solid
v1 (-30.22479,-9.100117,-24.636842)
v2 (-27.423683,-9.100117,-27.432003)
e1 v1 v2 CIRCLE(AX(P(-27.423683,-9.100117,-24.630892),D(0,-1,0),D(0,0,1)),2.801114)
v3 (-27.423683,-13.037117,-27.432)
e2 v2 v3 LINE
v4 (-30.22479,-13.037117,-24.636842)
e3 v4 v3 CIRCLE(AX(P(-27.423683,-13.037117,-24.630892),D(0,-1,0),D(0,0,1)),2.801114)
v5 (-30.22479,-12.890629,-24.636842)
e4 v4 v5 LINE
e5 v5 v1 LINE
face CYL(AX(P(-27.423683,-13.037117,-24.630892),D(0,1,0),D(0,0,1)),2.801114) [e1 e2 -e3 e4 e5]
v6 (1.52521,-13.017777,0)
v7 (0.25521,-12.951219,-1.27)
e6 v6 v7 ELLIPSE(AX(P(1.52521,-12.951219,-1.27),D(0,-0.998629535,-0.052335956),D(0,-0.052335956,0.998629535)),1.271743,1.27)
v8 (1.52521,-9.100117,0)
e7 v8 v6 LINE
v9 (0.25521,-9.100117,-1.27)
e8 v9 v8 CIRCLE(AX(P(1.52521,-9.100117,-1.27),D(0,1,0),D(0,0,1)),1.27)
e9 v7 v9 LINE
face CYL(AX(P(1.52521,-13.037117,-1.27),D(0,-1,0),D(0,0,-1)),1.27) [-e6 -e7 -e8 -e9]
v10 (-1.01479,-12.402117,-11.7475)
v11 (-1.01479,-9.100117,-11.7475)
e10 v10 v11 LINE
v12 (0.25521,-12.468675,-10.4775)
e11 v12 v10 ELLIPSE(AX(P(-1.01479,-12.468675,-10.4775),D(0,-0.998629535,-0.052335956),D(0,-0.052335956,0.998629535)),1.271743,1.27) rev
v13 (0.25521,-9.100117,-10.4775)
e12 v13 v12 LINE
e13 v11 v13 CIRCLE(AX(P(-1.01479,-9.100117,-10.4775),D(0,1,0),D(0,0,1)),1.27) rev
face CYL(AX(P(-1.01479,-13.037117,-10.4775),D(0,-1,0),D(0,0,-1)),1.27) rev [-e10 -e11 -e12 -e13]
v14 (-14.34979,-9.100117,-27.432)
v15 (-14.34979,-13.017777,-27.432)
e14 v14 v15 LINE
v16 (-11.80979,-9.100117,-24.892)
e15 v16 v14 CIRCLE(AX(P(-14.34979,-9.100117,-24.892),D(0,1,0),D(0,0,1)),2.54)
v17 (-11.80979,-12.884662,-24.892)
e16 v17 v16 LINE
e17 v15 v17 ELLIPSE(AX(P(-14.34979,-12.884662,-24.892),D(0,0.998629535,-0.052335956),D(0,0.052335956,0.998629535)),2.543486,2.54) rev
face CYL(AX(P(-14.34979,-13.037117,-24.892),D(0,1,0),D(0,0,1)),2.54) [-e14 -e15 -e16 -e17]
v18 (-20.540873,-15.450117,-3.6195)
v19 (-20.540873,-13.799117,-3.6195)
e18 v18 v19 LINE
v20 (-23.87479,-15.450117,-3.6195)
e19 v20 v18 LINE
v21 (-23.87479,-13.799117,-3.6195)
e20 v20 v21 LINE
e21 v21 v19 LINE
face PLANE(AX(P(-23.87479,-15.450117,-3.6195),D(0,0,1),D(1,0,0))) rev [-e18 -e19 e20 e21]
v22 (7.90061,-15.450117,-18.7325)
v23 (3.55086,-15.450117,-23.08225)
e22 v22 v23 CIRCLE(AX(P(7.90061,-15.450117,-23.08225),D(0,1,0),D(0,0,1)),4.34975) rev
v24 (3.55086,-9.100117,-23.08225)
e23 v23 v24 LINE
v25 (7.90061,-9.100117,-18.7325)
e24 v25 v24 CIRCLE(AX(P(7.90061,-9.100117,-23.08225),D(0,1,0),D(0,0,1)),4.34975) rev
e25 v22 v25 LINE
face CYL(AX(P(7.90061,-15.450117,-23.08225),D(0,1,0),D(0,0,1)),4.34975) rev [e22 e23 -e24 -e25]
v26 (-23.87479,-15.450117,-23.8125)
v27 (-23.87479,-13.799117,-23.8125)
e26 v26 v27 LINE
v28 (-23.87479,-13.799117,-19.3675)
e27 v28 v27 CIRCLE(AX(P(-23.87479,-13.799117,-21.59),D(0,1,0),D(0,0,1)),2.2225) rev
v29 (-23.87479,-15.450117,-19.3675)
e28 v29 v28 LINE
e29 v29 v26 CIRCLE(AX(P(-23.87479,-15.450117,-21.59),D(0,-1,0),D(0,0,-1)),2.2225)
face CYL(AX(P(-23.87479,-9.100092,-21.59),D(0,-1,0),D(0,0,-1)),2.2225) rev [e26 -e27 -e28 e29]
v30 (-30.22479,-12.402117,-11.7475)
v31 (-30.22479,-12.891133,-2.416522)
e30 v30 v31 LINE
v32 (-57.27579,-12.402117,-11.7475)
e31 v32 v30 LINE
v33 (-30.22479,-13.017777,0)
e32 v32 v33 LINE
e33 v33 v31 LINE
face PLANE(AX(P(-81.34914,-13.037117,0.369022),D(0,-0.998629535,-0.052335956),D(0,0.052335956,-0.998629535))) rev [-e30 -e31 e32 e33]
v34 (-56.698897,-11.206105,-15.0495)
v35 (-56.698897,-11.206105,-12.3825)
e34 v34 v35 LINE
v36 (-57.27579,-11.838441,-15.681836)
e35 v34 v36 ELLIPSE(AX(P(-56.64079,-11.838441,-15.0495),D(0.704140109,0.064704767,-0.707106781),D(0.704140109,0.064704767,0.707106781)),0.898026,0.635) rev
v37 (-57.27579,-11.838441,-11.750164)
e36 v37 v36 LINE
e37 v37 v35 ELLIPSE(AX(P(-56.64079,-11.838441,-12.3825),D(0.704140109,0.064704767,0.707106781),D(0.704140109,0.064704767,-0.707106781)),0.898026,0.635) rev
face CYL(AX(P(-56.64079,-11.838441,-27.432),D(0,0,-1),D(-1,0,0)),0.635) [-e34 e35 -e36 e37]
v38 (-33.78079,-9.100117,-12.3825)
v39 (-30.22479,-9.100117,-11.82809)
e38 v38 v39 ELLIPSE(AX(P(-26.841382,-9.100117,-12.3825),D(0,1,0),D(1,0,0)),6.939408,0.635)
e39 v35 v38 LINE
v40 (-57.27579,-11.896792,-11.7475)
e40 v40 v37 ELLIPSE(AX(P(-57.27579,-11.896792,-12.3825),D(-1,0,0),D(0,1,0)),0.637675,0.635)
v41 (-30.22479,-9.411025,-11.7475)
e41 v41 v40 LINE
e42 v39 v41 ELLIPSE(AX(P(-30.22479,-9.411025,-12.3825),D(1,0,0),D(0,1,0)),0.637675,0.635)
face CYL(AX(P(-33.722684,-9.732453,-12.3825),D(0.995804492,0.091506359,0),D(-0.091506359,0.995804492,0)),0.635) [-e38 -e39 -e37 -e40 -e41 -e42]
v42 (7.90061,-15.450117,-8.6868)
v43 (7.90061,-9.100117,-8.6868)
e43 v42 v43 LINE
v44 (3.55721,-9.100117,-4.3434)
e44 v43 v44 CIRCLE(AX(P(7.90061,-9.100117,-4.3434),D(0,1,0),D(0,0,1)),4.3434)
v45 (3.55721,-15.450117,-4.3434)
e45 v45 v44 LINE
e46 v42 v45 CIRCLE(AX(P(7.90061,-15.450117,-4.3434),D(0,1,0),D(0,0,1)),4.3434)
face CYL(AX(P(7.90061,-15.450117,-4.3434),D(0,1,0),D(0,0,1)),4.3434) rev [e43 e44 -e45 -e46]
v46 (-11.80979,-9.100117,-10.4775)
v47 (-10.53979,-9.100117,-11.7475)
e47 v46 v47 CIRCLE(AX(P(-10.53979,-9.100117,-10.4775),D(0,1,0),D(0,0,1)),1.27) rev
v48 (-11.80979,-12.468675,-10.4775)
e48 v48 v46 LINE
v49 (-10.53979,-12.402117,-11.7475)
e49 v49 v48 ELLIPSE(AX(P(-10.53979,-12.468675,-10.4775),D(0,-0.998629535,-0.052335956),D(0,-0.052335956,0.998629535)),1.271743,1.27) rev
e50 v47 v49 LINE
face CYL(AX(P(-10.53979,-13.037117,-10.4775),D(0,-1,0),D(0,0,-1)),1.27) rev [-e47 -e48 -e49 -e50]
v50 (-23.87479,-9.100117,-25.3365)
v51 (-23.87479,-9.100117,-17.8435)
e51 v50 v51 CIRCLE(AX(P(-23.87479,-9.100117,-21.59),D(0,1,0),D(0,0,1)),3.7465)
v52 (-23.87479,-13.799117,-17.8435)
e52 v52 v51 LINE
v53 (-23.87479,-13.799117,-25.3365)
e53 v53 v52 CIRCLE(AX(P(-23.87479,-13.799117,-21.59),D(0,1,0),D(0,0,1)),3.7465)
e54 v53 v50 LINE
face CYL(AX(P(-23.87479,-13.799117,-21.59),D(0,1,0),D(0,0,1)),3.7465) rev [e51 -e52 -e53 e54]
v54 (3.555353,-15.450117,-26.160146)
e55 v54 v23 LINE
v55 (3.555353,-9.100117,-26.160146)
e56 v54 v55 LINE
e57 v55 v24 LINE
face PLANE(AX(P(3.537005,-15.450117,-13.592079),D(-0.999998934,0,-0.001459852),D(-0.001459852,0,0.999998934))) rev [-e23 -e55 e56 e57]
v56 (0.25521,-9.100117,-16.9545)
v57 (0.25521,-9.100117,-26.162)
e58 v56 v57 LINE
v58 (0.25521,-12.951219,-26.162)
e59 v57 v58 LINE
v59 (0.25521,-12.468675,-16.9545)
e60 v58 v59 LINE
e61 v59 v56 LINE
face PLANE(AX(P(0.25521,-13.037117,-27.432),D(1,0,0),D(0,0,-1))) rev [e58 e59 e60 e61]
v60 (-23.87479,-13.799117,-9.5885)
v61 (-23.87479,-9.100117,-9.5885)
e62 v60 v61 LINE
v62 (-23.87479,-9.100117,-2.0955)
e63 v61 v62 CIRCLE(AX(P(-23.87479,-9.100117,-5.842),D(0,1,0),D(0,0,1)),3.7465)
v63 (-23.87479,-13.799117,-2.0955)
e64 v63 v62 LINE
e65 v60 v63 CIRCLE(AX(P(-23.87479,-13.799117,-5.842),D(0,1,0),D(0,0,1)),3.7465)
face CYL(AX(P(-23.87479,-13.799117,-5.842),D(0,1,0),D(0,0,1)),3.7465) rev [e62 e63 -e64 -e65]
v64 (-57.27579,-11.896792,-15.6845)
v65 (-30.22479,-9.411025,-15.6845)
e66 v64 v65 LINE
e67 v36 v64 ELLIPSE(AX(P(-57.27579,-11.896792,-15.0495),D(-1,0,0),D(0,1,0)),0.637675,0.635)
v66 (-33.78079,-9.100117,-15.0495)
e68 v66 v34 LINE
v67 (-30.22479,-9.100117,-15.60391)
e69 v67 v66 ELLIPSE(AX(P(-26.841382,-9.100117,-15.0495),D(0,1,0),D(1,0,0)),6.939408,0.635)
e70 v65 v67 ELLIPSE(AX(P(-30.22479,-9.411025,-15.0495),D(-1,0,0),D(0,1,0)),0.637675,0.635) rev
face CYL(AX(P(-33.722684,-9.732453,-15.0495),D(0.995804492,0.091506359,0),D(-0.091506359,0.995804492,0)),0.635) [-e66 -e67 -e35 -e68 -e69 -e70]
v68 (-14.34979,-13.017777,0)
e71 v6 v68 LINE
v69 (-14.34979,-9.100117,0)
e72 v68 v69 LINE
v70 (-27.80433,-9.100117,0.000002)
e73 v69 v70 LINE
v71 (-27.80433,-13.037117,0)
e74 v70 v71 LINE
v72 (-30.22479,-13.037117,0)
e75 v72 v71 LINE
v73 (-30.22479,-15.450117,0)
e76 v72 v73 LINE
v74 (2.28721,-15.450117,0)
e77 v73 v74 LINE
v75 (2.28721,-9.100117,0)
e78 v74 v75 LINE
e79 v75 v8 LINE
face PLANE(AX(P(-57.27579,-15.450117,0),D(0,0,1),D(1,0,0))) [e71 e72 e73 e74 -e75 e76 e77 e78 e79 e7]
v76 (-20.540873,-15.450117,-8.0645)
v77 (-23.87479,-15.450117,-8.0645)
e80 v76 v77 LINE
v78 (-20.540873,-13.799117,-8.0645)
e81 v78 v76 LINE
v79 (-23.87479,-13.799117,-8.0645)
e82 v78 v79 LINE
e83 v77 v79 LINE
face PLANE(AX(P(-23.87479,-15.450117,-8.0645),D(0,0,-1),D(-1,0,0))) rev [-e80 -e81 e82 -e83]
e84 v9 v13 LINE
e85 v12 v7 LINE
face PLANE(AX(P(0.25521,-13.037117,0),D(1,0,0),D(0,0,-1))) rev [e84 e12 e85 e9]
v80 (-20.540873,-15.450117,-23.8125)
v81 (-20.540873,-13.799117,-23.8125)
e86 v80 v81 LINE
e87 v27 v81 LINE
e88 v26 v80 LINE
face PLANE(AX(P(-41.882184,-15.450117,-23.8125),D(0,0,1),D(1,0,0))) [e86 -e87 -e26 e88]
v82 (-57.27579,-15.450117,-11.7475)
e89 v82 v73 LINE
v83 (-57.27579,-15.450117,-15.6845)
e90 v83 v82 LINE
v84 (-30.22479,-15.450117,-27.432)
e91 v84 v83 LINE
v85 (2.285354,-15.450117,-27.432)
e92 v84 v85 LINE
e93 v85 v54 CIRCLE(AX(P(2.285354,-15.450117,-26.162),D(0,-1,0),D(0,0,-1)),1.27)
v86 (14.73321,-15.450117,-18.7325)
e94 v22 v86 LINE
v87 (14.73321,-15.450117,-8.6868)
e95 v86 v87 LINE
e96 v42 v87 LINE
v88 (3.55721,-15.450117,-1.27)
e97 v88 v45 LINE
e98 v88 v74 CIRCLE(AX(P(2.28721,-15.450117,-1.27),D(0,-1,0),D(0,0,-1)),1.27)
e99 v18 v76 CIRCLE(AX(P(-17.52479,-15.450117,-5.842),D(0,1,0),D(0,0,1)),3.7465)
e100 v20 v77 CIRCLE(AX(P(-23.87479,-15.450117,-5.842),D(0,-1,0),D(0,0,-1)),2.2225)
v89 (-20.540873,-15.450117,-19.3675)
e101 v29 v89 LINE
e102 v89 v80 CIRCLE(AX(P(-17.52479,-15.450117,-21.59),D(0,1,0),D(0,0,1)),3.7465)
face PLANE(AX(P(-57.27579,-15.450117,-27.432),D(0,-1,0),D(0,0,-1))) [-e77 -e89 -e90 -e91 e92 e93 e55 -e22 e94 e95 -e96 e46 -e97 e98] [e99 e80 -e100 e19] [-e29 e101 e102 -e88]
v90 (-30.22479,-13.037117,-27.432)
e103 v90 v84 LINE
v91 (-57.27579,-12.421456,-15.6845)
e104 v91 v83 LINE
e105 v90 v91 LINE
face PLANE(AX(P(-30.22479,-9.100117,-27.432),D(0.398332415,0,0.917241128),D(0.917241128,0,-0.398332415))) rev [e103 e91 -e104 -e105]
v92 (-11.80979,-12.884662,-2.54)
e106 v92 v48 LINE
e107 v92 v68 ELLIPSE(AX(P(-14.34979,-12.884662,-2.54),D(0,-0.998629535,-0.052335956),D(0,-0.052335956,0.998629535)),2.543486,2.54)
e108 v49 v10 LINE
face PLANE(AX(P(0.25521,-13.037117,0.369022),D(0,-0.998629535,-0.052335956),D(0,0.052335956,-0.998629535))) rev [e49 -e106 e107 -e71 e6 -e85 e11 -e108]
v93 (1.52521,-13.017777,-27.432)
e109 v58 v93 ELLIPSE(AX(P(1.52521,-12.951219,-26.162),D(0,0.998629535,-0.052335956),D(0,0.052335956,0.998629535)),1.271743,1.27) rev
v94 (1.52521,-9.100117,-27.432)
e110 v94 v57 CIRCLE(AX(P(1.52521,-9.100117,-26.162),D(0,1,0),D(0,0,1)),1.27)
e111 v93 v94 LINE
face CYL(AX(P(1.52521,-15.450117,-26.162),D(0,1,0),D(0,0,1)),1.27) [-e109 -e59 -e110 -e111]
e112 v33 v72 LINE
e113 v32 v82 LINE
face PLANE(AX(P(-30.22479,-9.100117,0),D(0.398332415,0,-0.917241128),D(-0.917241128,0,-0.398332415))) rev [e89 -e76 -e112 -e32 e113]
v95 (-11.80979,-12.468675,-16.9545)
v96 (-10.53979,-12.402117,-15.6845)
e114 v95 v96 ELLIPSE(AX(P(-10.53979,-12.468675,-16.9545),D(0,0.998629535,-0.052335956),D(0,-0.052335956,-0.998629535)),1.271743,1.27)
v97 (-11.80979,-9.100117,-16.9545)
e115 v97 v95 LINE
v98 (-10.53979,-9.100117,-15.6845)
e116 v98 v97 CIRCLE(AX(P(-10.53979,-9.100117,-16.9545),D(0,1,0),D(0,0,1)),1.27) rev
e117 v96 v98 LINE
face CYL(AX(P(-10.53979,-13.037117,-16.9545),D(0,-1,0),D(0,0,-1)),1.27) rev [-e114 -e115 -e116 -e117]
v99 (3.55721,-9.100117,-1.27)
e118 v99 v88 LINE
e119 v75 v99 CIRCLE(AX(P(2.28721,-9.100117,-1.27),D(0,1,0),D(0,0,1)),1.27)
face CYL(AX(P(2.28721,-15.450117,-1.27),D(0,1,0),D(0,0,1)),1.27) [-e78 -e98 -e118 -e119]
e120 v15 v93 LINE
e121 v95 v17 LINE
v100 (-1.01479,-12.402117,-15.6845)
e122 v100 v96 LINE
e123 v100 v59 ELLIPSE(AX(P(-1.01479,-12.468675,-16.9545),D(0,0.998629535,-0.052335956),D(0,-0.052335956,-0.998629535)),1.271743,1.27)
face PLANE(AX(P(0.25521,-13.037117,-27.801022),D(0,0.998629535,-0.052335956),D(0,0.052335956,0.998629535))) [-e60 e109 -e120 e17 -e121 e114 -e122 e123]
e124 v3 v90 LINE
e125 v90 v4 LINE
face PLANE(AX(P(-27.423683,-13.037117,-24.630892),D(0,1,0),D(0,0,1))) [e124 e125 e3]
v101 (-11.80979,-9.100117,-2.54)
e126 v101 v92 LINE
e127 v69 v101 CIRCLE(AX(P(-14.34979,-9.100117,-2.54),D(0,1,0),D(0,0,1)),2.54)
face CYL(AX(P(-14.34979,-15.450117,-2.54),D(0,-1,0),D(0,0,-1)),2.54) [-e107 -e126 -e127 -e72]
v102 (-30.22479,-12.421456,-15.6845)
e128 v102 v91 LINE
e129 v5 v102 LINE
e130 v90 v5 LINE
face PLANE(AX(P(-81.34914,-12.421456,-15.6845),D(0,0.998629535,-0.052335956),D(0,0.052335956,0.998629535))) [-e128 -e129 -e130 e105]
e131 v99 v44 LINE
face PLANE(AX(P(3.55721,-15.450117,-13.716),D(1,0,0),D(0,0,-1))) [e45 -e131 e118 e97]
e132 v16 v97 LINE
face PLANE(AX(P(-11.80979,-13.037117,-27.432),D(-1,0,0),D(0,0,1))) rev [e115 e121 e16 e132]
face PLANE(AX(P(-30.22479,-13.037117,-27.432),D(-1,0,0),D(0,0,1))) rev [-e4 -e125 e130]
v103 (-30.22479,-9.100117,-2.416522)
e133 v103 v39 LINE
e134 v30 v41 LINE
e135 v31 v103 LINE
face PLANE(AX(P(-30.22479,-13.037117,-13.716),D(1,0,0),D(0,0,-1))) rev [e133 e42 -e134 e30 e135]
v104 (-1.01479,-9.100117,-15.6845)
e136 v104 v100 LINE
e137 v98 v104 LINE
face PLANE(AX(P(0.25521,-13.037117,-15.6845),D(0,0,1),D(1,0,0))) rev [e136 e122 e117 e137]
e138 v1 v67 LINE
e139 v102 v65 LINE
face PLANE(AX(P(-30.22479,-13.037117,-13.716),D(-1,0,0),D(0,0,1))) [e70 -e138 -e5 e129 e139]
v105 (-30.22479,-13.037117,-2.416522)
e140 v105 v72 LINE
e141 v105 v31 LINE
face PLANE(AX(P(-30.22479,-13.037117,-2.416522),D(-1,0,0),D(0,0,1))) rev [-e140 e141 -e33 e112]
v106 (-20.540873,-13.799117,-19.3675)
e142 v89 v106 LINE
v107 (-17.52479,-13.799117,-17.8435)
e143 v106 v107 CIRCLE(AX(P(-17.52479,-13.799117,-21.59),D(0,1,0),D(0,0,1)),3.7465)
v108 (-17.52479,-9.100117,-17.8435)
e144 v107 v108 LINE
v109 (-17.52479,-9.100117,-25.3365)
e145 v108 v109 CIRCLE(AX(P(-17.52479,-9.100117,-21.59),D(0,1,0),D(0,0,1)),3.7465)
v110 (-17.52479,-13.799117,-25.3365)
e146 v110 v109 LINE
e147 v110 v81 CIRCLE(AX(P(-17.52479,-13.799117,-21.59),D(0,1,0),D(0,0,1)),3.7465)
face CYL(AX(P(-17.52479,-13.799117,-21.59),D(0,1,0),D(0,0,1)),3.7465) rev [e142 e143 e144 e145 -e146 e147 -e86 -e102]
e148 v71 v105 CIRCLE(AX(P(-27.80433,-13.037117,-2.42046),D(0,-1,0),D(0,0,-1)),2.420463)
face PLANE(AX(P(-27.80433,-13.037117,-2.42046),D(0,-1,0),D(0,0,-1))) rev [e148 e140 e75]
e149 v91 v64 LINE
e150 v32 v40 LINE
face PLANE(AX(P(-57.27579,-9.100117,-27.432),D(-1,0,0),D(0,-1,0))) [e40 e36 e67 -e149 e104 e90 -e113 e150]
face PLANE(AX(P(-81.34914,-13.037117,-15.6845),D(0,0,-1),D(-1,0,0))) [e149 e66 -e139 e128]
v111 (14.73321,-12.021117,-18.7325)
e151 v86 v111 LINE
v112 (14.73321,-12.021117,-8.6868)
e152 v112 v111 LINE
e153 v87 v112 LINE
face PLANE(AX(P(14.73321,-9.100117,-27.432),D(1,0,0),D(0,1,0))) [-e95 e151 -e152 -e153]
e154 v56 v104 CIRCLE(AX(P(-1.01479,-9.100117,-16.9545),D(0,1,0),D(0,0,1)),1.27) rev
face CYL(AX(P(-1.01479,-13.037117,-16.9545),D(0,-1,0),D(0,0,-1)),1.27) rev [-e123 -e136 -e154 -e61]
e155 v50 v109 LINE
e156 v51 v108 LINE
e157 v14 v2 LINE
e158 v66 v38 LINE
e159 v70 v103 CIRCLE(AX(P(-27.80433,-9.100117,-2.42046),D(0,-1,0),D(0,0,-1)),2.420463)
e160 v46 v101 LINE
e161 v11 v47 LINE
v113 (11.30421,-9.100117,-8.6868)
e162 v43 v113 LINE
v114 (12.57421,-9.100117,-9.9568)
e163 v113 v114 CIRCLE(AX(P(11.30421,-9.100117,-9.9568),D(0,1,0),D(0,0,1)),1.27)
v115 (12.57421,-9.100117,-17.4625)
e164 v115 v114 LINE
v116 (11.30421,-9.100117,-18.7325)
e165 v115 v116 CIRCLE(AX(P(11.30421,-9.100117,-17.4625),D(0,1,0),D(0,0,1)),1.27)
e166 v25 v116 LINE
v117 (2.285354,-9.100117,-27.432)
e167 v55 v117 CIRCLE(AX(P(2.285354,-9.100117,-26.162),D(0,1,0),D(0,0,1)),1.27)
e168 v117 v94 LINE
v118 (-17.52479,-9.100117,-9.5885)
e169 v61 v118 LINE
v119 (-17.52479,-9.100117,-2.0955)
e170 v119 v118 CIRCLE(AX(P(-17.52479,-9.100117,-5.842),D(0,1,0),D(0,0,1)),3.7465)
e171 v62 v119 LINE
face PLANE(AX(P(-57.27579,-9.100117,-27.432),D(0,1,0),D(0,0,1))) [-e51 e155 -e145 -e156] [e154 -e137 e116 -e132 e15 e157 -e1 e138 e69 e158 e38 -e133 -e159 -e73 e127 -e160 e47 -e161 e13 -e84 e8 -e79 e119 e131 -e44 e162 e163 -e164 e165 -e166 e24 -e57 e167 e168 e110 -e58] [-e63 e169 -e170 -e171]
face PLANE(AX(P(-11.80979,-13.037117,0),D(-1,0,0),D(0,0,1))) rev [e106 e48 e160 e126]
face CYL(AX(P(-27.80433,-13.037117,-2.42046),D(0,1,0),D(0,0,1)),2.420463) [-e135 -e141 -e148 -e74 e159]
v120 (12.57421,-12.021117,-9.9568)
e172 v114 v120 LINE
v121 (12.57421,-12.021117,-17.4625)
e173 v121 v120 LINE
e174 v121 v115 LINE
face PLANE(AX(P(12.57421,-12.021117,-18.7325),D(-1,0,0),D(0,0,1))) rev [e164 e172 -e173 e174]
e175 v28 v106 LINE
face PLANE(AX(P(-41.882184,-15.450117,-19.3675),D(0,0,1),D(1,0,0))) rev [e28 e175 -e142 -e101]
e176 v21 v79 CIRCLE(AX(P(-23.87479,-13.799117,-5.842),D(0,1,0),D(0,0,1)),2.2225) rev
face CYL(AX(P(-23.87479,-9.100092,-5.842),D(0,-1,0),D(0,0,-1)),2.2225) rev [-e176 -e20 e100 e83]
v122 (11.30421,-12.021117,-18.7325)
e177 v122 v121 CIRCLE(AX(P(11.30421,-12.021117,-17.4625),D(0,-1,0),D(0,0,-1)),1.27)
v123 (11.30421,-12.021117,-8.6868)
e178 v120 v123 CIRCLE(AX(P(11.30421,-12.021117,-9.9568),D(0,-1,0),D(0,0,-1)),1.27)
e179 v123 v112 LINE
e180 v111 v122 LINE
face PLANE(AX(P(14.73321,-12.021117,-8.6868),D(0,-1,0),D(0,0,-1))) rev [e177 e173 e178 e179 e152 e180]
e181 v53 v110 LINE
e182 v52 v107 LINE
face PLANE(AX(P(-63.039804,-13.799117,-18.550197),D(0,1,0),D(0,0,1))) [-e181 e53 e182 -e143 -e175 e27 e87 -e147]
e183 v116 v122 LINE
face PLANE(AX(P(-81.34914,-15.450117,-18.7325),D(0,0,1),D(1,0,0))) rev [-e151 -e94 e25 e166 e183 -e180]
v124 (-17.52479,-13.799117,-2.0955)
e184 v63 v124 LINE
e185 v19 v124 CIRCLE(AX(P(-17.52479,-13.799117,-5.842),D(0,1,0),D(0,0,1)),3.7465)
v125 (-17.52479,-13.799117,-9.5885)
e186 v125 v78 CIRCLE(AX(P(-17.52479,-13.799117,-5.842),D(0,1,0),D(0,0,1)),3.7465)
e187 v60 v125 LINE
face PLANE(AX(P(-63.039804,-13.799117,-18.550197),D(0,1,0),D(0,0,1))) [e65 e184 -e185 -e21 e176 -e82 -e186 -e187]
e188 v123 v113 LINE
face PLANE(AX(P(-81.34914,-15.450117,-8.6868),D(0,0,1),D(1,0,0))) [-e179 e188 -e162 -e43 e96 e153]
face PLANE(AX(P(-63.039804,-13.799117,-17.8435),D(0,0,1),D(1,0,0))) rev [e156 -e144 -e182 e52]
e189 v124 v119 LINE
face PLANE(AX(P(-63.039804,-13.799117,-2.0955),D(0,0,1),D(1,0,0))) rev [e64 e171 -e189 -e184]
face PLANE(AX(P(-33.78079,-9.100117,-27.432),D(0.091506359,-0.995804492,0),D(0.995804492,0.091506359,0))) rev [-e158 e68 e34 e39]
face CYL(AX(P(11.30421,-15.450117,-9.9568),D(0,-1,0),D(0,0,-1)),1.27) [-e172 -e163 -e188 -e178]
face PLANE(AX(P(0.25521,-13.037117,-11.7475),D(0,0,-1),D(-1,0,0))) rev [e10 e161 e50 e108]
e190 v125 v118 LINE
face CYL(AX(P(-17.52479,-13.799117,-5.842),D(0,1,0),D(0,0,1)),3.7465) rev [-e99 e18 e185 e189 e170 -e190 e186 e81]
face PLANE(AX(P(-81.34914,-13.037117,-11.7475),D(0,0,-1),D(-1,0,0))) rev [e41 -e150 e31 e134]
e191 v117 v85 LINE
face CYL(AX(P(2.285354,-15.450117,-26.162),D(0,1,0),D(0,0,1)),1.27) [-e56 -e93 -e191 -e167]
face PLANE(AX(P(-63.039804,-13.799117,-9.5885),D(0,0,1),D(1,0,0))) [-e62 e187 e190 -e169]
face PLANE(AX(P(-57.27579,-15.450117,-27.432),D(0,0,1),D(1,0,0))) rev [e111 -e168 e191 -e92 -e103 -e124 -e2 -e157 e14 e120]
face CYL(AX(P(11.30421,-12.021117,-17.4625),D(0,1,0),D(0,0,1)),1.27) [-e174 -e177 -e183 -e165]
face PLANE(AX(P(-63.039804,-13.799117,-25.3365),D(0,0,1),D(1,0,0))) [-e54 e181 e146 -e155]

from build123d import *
from OCP.BRepAlgoAPI import BRepAlgoAPI_Cut
from OCP.TopTools import TopTools_ListOfShape

# Parameters (mm, degrees)
SKETCH1_W           = 72.009
SKETCH1_H           = 6.35
BOSS_EXTRUDE1_DEPTH = 27.432
CUT_EXTRUDE2_DEPTH  = 64.822827375
SKETCH4_W           = 12.065
SKETCH4_H           = 11.7475
CUT_EXTRUDE3_DEPTH  = 3.937
SKETCH5_W           = 27.051
SKETCH5_H           = 11.7475
CUT_EXTRUDE4_DEPTH  = 3.937
SKETCH6_W           = 2.159
SKETCH6_H           = 10.0457
CUT_EXTRUDE5_DEPTH  = 2.921
CHAMFER1_SIZE       = 0.635
CHAMFER1_SIZE_2     = 12.116521797
CHAMFER2_SIZE       = 12.116521797
CHAMFER2_SIZE_2     = 0.635
CHAMFER3_SIZE       = 0.615660387
CHAMFER3_SIZE_2     = 11.7475
CUT_EXTRUDE8_DEPTH  = 64.822827375
CUT_EXTRUDE10_DEPTH = 62.361435951
FILLET1_R           = 2.54
FILLET2_R           = 2.54
FILLET5_R           = 1.27
FILLET6_R           = 1.27
FILLET10_R          = 1.27
CUT_EXTRUDE11_START = -3.937
CUT_EXTRUDE11_DEPTH = 4.937
SKETCH17_R          = 2.2225
CUT_EXTRUDE12_DEPTH = 64.82283009
CUT_EXTRUDE13_START = -4.699
SKETCH18_R          = 3.7465
SKETCH18_R_2        = 2.2225
CUT_EXTRUDE13_DEPTH = 4.699
SKETCH19_R          = 3.7465
CUT_EXTRUDE14_DEPTH = 64.679759278
SKETCH20_W          = 4.845296959
SKETCH20_H          = 4.445
CUT_EXTRUDE15_DEPTH = 64.679759278
FILLET12_R          = 0.635


with BuildPart() as part:
    # Sketch1 → Boss-Extrude1 (new body)
    with BuildSketch(Plane.XY):
        with Locations((-21.271290436, -12.275116881)):
            Rectangle(SKETCH1_W, SKETCH1_H)
    extrude(amount=-BOSS_EXTRUDE1_DEPTH)

    # Sketch3 → Cut-Extrude2 (cut, through all)
    with BuildSketch(Plane(origin=(0, -9.100116881, 0), x_dir=(1, 0, 0), z_dir=(0, 1, 0))):
        with BuildLine():
            ThreePointArc((3.550859564, 23.08225), (4.824871842, 20.006512279), (7.900609564, 18.7325))
            Line((7.900609564, 18.7325), (14.733209564, 18.7325))
            Line((14.733209564, 18.7325), (14.733209564, 27.432))
            Line((14.733209564, 27.432), (3.557209564, 27.432))
            Line((3.557209564, 27.432), (3.550859564, 23.08225))
        make_face()
        with BuildLine():
            Line((14.733209564, 0), (14.733209564, 8.6868))
            Line((14.733209564, 8.6868), (7.900609564, 8.6868))
            ThreePointArc((7.900609564, 8.6868), (4.82936197, 7.414647593), (3.557209564, 4.3434))
            Line((3.557209564, 4.3434), (3.557209564, 0))
            Line((3.557209564, 0), (14.733209564, 0))
        make_face()
    extrude(amount=-CUT_EXTRUDE2_DEPTH, mode=Mode.SUBTRACT)

    # Sketch4 → Cut-Extrude3 (cut)
    with BuildSketch(Plane(origin=(0, -9.100116881, 0), x_dir=(1, 0, 0), z_dir=(0, 1, 0))):
        with Locations((-5.777290436, 21.55825)):
            Rectangle(SKETCH4_W, SKETCH4_H)
        with Locations((-5.777290436, 5.87375)):
            Rectangle(SKETCH4_W, SKETCH4_H)
    extrude(amount=-CUT_EXTRUDE3_DEPTH, mode=Mode.SUBTRACT)

    # Sketch5 → Cut-Extrude4 (cut)
    with BuildSketch(Plane(origin=(0, -9.100116881, 0), x_dir=(1, 0, 0), z_dir=(0, 1, 0))):
        with Locations((-43.750290436, 21.55825)):
            Rectangle(SKETCH5_W, SKETCH5_H)
        with Locations((-43.750290436, 5.87375)):
            Rectangle(SKETCH5_W, SKETCH5_H)
    extrude(amount=-CUT_EXTRUDE4_DEPTH, mode=Mode.SUBTRACT)

    # Sketch6 → Cut-Extrude5 (cut)
    with BuildSketch(Plane(origin=(0, -9.100116881, 0), x_dir=(1, 0, 0), z_dir=(0, 1, 0))):
        with Locations((13.653709564, 13.70965)):
            Rectangle(SKETCH6_W, SKETCH6_H)
    extrude(amount=-CUT_EXTRUDE5_DEPTH, mode=Mode.SUBTRACT)

    # Chamfer1
    # the kernel refuses this chamfer: 12.116521797, 0.635 mm, written as the material it adds along each edge
    with BuildSketch(Plane(origin=(-43.311150406, -13.037116881, -11.7475), x_dir=(0, 1, 0), z_dir=(1, 0, 0))) as chamfer1_piece_1_section:
        Polygon((CHAMFER1_SIZE, 0), (0, CHAMFER1_SIZE_2), (0, 0), align=None)
    chamfer1_piece_1 = extrude(amount=75.06771994, mode=Mode.PRIVATE)
    chamfer1_piece_1 = split(chamfer1_piece_1, bisect_by=Plane(origin=(-43.311150406, -13.037116881, 0), z_dir=(0, 0, -1)), keep=Keep.TOP, mode=Mode.PRIVATE)
    chamfer1_piece_1 = split(chamfer1_piece_1, bisect_by=Plane(origin=(3.557209564, -13.037116881, -11.7475), z_dir=(-1, 0, 0)), keep=Keep.TOP, mode=Mode.PRIVATE)
    add(chamfer1_piece_1)
    with BuildSketch(Plane(origin=(1.276569534, -13.037116881, -11.7475), x_dir=(0, 1, 0), z_dir=(-1, 0, 0))) as chamfer1_piece_2_section:
        Polygon((CHAMFER1_SIZE, 0), (0, -CHAMFER1_SIZE_2), (0, 0), align=None)
    chamfer1_piece_2 = extrude(amount=58.55235997, mode=Mode.PRIVATE)
    chamfer1_piece_2 = split(chamfer1_piece_2, bisect_by=Plane(origin=(1.276569534, -13.037116881, 0), z_dir=(0, 0, -1)), keep=Keep.TOP, mode=Mode.PRIVATE)
    add(chamfer1_piece_2)

    # Chamfer2
    # the kernel refuses this chamfer: 12.116521797, 0.635 mm, written as the material it adds along each edge
    with BuildSketch(Plane(origin=(-11.809790436, -13.037116881, -15.6845), x_dir=(0, 0, -1), z_dir=(1, 0, 0))) as chamfer2_piece_1_section:
        Polygon((CHAMFER2_SIZE, 0), (0, CHAMFER2_SIZE_2), (0, 0), align=None)
    chamfer2_piece_1 = extrude(amount=43.56635997, mode=Mode.PRIVATE)
    chamfer2_piece_1 = split(chamfer2_piece_1, bisect_by=Plane(origin=(-11.809790436, -13.037116881, -27.432), z_dir=(0, 0, 1)), keep=Keep.TOP, mode=Mode.PRIVATE)
    chamfer2_piece_1 = split(chamfer2_piece_1, bisect_by=Plane(origin=(3.540027216, -13.037116881, -15.662091507), z_dir=(-0.9999989344148313, 0, -0.0014598524589999236)), keep=Keep.TOP, mode=Mode.PRIVATE)
    add(chamfer2_piece_1)

    # Chamfer3
    # the kernel refuses this chamfer: 11.7475, 0.615660387 mm, written as the material it adds along each edge
    with BuildSketch(Plane(origin=(-57.275790436, -13.037116881, -15.6845), x_dir=(0, 1, 0), z_dir=(1, 0, 0))) as chamfer3_piece_1:
        Polygon((CHAMFER3_SIZE, 0), (0, -CHAMFER3_SIZE_2), (0, 0), align=None)
    extrude(amount=57.592951928)

    # Sketch14 → Cut-Extrude8 (cut, through all)
    with BuildSketch(Plane.XZ.offset(15.450116881)):
        Polygon((-30.224790436, 0), (-57.275790436, -11.7475), (-57.275790436, 0), align=None)
        Polygon((-30.224790436, -27.432), (-57.275790436, -15.6845), (-57.275790436, -27.432), align=None)
    extrude(amount=-CUT_EXTRUDE8_DEPTH, mode=Mode.SUBTRACT)

    # Sketch15 → Cut-Extrude10 (cut, through all)
    with BuildSketch(Plane.XY.offset(-11.7475)):
        Polygon((-57.275790436, -9.100116881), (-33.780790436, -9.100116881), (-57.275790436, -11.259116881), align=None)
    extrude(amount=-CUT_EXTRUDE10_DEPTH, mode=Mode.SUBTRACT)

    # Fillet1
    fillet1_edges = [part.edges().sort_by_distance(p)[0] for p in [
        (-11.809790436, -11.058947074, -27.432),
    ]]
    fillet(fillet1_edges, radius=FILLET1_R)

    # Fillet2
    fillet2_edges = [part.edges().sort_by_distance(p)[0] for p in [
        (-11.809790436, -11.058947074, 0),
    ]]
    fillet(fillet2_edges, radius=FILLET2_R)

    # Fillet5
    fillet5_edges = [part.edges().sort_by_distance(p)[0] for p in [
        (0.255209564, -11.058947074, 0),
        (0.255209564, -11.058947074, -27.432),
        (3.557209564, -12.275116881, -27.432),
        (3.557209564, -12.275116881, 0),
    ]]
    fillet(fillet5_edges, radius=FILLET5_R)

    # Fillet6
    fillet6_edges = [part.edges().sort_by_distance(p)[0] for p in [
        (12.574209564, -10.560616881, -8.6868),
        (12.574209564, -10.560616881, -18.7325),
    ]]
    fillet(fillet6_edges, radius=FILLET6_R)

    # Fillet10
    fillet10_edges = [part.edges().sort_by_distance(p)[0] for p in [
        (-11.809790436, -10.751116881, -11.7475),
        (0.255209564, -10.751116881, -11.7475),
        (0.255209564, -10.751116881, -15.6845),
        (-11.809790436, -10.751116881, -15.6845),
    ]]
    fillet(fillet10_edges, radius=FILLET10_R)


with BuildPart() as cut_extrude11_tool:
    # Cut-Extrude11: read off the stored shape, not the designer's step
    # Cut-Extrude11 outline → Cut-Extrude11 (new body)
    with BuildSketch(Plane(origin=(0, -9.100116881, 0), x_dir=(1, 0, 0), z_dir=(0, 1, 0)).offset(CUT_EXTRUDE11_START)):
        with BuildLine():
            Line((-27.423682508, 27.432006318), (-30.224790436, 27.432))
            Line((-30.224790436, 27.432), (-30.224790436, 24.636841581))
            ThreePointArc((-30.224790436, 24.636841581), (-29.402264799, 26.613681304), (-27.423682508, 27.432006318))
        make_face()
        with BuildLine():
            ThreePointArc((-27.804330441, -3.203e-06), (-29.514463685, 0.70754249), (-30.224790436, 2.416522456))
            Line((-30.224790436, 2.416522456), (-30.224790436, 0))
            Line((-30.224790436, 0), (-27.804330441, -3.203e-06))
        make_face()
    extrude(amount=CUT_EXTRUDE11_DEPTH)


with BuildPart() as part_1:
    add(part.part)

    # Cut-Extrude11: cut by cut_extrude11_tool, with a tolerance
    cut_extrude11_stock = TopTools_ListOfShape()
    cut_extrude11_stock.Append(part_1.part.wrapped)
    cut_extrude11_tools = TopTools_ListOfShape()
    cut_extrude11_tools.Append(cut_extrude11_tool.part.wrapped)
    cut_extrude11_cut = BRepAlgoAPI_Cut()
    cut_extrude11_cut.SetArguments(cut_extrude11_stock)
    cut_extrude11_cut.SetTools(cut_extrude11_tools)
    cut_extrude11_cut.SetFuzzyValue(0.00001)
    cut_extrude11_cut.Build()
    add(Compound.cast(cut_extrude11_cut.Shape()).solids(), mode=Mode.REPLACE)

    # Sketch17 → Cut-Extrude12 (cut, through all)
    with BuildSketch(Plane.XZ.offset(15.450116881)):
        with Locations(Location((-23.874790436, -5.842, 0), (0, 0, 270))):
            Circle(SKETCH17_R)
        with Locations(Location((-23.874790436, -21.59, 0), (0, 0, 270))):
            Circle(SKETCH17_R)
    extrude(amount=-CUT_EXTRUDE12_DEPTH, mode=Mode.SUBTRACT)

    # Sketch18 → Cut-Extrude13 (cut)
    # profile 1 of 16: a face of its own
    with BuildSketch(Plane(origin=(0, -9.100116881, 0), x_dir=(1, 0, 0), z_dir=(0, 1, 0)).offset(CUT_EXTRUDE13_START)):
        with Locations((-17.524790436, 21.59)):
            Circle(SKETCH18_R)
    # profile 2 of 16: a face of its own
    with BuildSketch(Plane(origin=(0, -9.100116881, 0), x_dir=(1, 0, 0), z_dir=(0, 1, 0)).offset(CUT_EXTRUDE13_START)):
        with Locations((-23.874790436, 21.59)):
            Circle(SKETCH18_R)
        with Locations(Location((-23.874790436, 21.59, 0), (0, 0, 90))):
            Circle(SKETCH18_R_2, mode=Mode.SUBTRACT)
    # profile 3 of 16: a face of its own
    with BuildSketch(Plane(origin=(0, -9.100116881, 0), x_dir=(1, 0, 0), z_dir=(0, 1, 0)).offset(CUT_EXTRUDE13_START)):
        with BuildLine():
            Line((-17.524790436, 25.3365), (-23.874790436, 25.3365))
            ThreePointArc((-23.874790436, 25.3365), (-22.060275437, 24.867773264), (-20.699790436, 23.57887839))
            ThreePointArc((-20.699790436, 23.57887839), (-19.339305435, 24.867773264), (-17.524790436, 25.3365))
        make_face()
    # profile 4 of 16: a face of its own
    with BuildSketch(Plane(origin=(0, -9.100116881, 0), x_dir=(1, 0, 0), z_dir=(0, 1, 0)).offset(CUT_EXTRUDE13_START)):
        with Locations((-17.524790436, 21.59)):
            Circle(SKETCH18_R)
    # profile 5 of 16: a face of its own
    with BuildSketch(Plane(origin=(0, -9.100116881, 0), x_dir=(1, 0, 0), z_dir=(0, 1, 0)).offset(CUT_EXTRUDE13_START)):
        with Locations((-23.874790436, 21.59)):
            Circle(SKETCH18_R)
    # profile 6 of 16: a face of its own
    with BuildSketch(Plane(origin=(0, -9.100116881, 0), x_dir=(1, 0, 0), z_dir=(0, 1, 0)).offset(CUT_EXTRUDE13_START)):
        with BuildLine():
            ThreePointArc((-20.699790436, 19.60112161), (-22.060275437, 18.312226736), (-23.874790436, 17.8435))
            Line((-23.874790436, 17.8435), (-17.524790436, 17.8435))
            ThreePointArc((-17.524790436, 17.8435), (-19.339305435, 18.312226736), (-20.699790436, 19.60112161))
        make_face()
    # profile 7 of 16: a face of its own
    with BuildSketch(Plane(origin=(0, -9.100116881, 0), x_dir=(1, 0, 0), z_dir=(0, 1, 0)).offset(CUT_EXTRUDE13_START)):
        with Locations((-23.874790436, 21.59)):
            Circle(SKETCH18_R)
    # profile 8 of 16: a face of its own
    with BuildSketch(Plane(origin=(0, -9.100116881, 0), x_dir=(1, 0, 0), z_dir=(0, 1, 0)).offset(CUT_EXTRUDE13_START)):
        with Locations((-17.524790436, 21.59)):
            Circle(SKETCH18_R)
    # profile 9 of 16: a face of its own
    with BuildSketch(Plane(origin=(0, -9.100116881, 0), x_dir=(1, 0, 0), z_dir=(0, 1, 0)).offset(CUT_EXTRUDE13_START)):
        with Locations((-17.524790436, 5.842)):
            Circle(SKETCH18_R)
    # profile 10 of 16: a face of its own
    with BuildSketch(Plane(origin=(0, -9.100116881, 0), x_dir=(1, 0, 0), z_dir=(0, 1, 0)).offset(CUT_EXTRUDE13_START)):
        with Locations((-23.874790436, 5.842)):
            Circle(SKETCH18_R)
        with Locations(Location((-23.874790436, 5.842, 0), (0, 0, 90))):
            Circle(SKETCH18_R_2, mode=Mode.SUBTRACT)
    # profile 11 of 16: a face of its own
    with BuildSketch(Plane(origin=(0, -9.100116881, 0), x_dir=(1, 0, 0), z_dir=(0, 1, 0)).offset(CUT_EXTRUDE13_START)):
        with BuildLine():
            Line((-17.524790436, 9.5885), (-23.874790436, 9.5885))
            ThreePointArc((-23.874790436, 9.5885), (-22.060275437, 9.119773264), (-20.699790436, 7.83087839))
            ThreePointArc((-20.699790436, 7.83087839), (-19.339305435, 9.119773264), (-17.524790436, 9.5885))
        make_face()
    # profile 12 of 16: a face of its own
    with BuildSketch(Plane(origin=(0, -9.100116881, 0), x_dir=(1, 0, 0), z_dir=(0, 1, 0)).offset(CUT_EXTRUDE13_START)):
        with Locations((-17.524790436, 5.842)):
            Circle(SKETCH18_R)
    # profile 13 of 16: a face of its own
    with BuildSketch(Plane(origin=(0, -9.100116881, 0), x_dir=(1, 0, 0), z_dir=(0, 1, 0)).offset(CUT_EXTRUDE13_START)):
        with Locations((-23.874790436, 5.842)):
            Circle(SKETCH18_R)
    # profile 14 of 16: a face of its own
    with BuildSketch(Plane(origin=(0, -9.100116881, 0), x_dir=(1, 0, 0), z_dir=(0, 1, 0)).offset(CUT_EXTRUDE13_START)):
        with Locations((-23.874790436, 5.842)):
            Circle(SKETCH18_R)
    # profile 15 of 16: a face of its own
    with BuildSketch(Plane(origin=(0, -9.100116881, 0), x_dir=(1, 0, 0), z_dir=(0, 1, 0)).offset(CUT_EXTRUDE13_START)):
        with Locations((-17.524790436, 5.842)):
            Circle(SKETCH18_R)
    # profile 16 of 16: a face of its own
    with BuildSketch(Plane(origin=(0, -9.100116881, 0), x_dir=(1, 0, 0), z_dir=(0, 1, 0)).offset(CUT_EXTRUDE13_START)):
        with BuildLine():
            ThreePointArc((-20.699790436, 3.85312161), (-22.060275437, 2.564226736), (-23.874790436, 2.0955))
            Line((-23.874790436, 2.0955), (-17.524790436, 2.0955))
            ThreePointArc((-17.524790436, 2.0955), (-19.339305435, 2.564226736), (-20.699790436, 3.85312161))
        make_face()
    extrude(amount=CUT_EXTRUDE13_DEPTH, mode=Mode.SUBTRACT)

    # Sketch19 → Cut-Extrude14 (cut, through all)
    with BuildSketch(Plane(origin=(0, -13.799116881, 0), x_dir=(1, 0, 0), z_dir=(0, 1, 0))):
        with BuildLine():
            Line((-20.540873326, 23.8125), (-23.874790436, 23.8125))
            ThreePointArc((-23.874790436, 23.8125), (-21.652290436, 21.59), (-23.874790436, 19.3675))
            Line((-23.874790436, 19.3675), (-20.540873326, 19.3675))
            ThreePointArc((-20.540873326, 19.3675), (-13.778290436, 21.59), (-20.540873326, 23.8125))
        make_face()
        with Locations(Location((-17.524790436, 5.842, 0), (0, 0, 270))):
            Circle(SKETCH19_R)
    extrude(amount=-CUT_EXTRUDE14_DEPTH, mode=Mode.SUBTRACT)

    # Sketch20 → Cut-Extrude15 (cut, through all)
    with BuildSketch(Plane(origin=(0, -13.799116881, 0), x_dir=(1, 0, 0), z_dir=(0, 1, 0))):
        with Locations((-21.452141957, 5.842)):
            Rectangle(SKETCH20_W, SKETCH20_H)
    extrude(amount=-CUT_EXTRUDE15_DEPTH, mode=Mode.SUBTRACT)

    # Fillet12
    # the kernel refuses this fillet: 0.635 mm, written as the material it takes off along each edge
    with BuildSketch(Plane(origin=(-57.275790436, -11.259116881, -10.299189948), x_dir=(0.9958044920127651, 0.09150635872549404, 0), z_dir=(0, 0, -1))) as fillet12_piece_1:
        with BuildLine():
            CenterArc((FILLET12_R * 0.912321292544, FILLET12_R), FILLET12_R, 185.25027273, 84.74972727)
            Line((-FILLET12_R * 0.0834831994685, FILLET12_R * 0.908493641275), (0, 0))
            Line((0, 0), (FILLET12_R * 0.912321292544, 0))
        make_face()
    extrude(amount=6.833620104, mode=Mode.SUBTRACT)
    with BuildSketch(Plane(origin=(-25.876592281, -8.373785158, -15.6845), x_dir=(0, 0, 1), z_dir=(-0.9958044920127651, -0.09150635872549373, 0))) as fillet12_piece_2_section:
        with BuildLine():
            CenterArc((FILLET12_R, -FILLET12_R), FILLET12_R, 90, 90)
            Line((0, -FILLET12_R), (0, 0))
            Line((0, 0), (FILLET12_R, 0))
        make_face()
    fillet12_piece_2 = extrude(amount=33.118988768, mode=Mode.PRIVATE)
    fillet12_piece_2 = split(fillet12_piece_2, bisect_by=Plane(origin=(-30.224790436, -8.373785158, -15.6845), z_dir=(-1, 0, 0)), keep=Keep.TOP, mode=Mode.PRIVATE)
    add(fillet12_piece_2, mode=Mode.SUBTRACT)
    with BuildSketch(Plane(origin=(-25.876592281, -8.373785158, -11.7475), x_dir=(0.09150635872549373, -0.9958044920127651, 1.3987061727561039e-14), z_dir=(-0.9958044920127651, -0.09150635872549373, 0))) as fillet12_piece_3_section:
        with BuildLine():
            CenterArc((FILLET12_R, -FILLET12_R), FILLET12_R, 90, 90)
            Line((0, -FILLET12_R), (0, 0))
            Line((0, 0), (FILLET12_R, 0))
        make_face()
    fillet12_piece_3 = extrude(amount=33.118988768, mode=Mode.PRIVATE)
    fillet12_piece_3 = split(fillet12_piece_3, bisect_by=Plane(origin=(-30.224790436, -8.373785158, -11.7475), z_dir=(-1, 0, 0)), keep=Keep.TOP, mode=Mode.PRIVATE)
    add(fillet12_piece_3, mode=Mode.SUBTRACT)


solid = part_1.part
